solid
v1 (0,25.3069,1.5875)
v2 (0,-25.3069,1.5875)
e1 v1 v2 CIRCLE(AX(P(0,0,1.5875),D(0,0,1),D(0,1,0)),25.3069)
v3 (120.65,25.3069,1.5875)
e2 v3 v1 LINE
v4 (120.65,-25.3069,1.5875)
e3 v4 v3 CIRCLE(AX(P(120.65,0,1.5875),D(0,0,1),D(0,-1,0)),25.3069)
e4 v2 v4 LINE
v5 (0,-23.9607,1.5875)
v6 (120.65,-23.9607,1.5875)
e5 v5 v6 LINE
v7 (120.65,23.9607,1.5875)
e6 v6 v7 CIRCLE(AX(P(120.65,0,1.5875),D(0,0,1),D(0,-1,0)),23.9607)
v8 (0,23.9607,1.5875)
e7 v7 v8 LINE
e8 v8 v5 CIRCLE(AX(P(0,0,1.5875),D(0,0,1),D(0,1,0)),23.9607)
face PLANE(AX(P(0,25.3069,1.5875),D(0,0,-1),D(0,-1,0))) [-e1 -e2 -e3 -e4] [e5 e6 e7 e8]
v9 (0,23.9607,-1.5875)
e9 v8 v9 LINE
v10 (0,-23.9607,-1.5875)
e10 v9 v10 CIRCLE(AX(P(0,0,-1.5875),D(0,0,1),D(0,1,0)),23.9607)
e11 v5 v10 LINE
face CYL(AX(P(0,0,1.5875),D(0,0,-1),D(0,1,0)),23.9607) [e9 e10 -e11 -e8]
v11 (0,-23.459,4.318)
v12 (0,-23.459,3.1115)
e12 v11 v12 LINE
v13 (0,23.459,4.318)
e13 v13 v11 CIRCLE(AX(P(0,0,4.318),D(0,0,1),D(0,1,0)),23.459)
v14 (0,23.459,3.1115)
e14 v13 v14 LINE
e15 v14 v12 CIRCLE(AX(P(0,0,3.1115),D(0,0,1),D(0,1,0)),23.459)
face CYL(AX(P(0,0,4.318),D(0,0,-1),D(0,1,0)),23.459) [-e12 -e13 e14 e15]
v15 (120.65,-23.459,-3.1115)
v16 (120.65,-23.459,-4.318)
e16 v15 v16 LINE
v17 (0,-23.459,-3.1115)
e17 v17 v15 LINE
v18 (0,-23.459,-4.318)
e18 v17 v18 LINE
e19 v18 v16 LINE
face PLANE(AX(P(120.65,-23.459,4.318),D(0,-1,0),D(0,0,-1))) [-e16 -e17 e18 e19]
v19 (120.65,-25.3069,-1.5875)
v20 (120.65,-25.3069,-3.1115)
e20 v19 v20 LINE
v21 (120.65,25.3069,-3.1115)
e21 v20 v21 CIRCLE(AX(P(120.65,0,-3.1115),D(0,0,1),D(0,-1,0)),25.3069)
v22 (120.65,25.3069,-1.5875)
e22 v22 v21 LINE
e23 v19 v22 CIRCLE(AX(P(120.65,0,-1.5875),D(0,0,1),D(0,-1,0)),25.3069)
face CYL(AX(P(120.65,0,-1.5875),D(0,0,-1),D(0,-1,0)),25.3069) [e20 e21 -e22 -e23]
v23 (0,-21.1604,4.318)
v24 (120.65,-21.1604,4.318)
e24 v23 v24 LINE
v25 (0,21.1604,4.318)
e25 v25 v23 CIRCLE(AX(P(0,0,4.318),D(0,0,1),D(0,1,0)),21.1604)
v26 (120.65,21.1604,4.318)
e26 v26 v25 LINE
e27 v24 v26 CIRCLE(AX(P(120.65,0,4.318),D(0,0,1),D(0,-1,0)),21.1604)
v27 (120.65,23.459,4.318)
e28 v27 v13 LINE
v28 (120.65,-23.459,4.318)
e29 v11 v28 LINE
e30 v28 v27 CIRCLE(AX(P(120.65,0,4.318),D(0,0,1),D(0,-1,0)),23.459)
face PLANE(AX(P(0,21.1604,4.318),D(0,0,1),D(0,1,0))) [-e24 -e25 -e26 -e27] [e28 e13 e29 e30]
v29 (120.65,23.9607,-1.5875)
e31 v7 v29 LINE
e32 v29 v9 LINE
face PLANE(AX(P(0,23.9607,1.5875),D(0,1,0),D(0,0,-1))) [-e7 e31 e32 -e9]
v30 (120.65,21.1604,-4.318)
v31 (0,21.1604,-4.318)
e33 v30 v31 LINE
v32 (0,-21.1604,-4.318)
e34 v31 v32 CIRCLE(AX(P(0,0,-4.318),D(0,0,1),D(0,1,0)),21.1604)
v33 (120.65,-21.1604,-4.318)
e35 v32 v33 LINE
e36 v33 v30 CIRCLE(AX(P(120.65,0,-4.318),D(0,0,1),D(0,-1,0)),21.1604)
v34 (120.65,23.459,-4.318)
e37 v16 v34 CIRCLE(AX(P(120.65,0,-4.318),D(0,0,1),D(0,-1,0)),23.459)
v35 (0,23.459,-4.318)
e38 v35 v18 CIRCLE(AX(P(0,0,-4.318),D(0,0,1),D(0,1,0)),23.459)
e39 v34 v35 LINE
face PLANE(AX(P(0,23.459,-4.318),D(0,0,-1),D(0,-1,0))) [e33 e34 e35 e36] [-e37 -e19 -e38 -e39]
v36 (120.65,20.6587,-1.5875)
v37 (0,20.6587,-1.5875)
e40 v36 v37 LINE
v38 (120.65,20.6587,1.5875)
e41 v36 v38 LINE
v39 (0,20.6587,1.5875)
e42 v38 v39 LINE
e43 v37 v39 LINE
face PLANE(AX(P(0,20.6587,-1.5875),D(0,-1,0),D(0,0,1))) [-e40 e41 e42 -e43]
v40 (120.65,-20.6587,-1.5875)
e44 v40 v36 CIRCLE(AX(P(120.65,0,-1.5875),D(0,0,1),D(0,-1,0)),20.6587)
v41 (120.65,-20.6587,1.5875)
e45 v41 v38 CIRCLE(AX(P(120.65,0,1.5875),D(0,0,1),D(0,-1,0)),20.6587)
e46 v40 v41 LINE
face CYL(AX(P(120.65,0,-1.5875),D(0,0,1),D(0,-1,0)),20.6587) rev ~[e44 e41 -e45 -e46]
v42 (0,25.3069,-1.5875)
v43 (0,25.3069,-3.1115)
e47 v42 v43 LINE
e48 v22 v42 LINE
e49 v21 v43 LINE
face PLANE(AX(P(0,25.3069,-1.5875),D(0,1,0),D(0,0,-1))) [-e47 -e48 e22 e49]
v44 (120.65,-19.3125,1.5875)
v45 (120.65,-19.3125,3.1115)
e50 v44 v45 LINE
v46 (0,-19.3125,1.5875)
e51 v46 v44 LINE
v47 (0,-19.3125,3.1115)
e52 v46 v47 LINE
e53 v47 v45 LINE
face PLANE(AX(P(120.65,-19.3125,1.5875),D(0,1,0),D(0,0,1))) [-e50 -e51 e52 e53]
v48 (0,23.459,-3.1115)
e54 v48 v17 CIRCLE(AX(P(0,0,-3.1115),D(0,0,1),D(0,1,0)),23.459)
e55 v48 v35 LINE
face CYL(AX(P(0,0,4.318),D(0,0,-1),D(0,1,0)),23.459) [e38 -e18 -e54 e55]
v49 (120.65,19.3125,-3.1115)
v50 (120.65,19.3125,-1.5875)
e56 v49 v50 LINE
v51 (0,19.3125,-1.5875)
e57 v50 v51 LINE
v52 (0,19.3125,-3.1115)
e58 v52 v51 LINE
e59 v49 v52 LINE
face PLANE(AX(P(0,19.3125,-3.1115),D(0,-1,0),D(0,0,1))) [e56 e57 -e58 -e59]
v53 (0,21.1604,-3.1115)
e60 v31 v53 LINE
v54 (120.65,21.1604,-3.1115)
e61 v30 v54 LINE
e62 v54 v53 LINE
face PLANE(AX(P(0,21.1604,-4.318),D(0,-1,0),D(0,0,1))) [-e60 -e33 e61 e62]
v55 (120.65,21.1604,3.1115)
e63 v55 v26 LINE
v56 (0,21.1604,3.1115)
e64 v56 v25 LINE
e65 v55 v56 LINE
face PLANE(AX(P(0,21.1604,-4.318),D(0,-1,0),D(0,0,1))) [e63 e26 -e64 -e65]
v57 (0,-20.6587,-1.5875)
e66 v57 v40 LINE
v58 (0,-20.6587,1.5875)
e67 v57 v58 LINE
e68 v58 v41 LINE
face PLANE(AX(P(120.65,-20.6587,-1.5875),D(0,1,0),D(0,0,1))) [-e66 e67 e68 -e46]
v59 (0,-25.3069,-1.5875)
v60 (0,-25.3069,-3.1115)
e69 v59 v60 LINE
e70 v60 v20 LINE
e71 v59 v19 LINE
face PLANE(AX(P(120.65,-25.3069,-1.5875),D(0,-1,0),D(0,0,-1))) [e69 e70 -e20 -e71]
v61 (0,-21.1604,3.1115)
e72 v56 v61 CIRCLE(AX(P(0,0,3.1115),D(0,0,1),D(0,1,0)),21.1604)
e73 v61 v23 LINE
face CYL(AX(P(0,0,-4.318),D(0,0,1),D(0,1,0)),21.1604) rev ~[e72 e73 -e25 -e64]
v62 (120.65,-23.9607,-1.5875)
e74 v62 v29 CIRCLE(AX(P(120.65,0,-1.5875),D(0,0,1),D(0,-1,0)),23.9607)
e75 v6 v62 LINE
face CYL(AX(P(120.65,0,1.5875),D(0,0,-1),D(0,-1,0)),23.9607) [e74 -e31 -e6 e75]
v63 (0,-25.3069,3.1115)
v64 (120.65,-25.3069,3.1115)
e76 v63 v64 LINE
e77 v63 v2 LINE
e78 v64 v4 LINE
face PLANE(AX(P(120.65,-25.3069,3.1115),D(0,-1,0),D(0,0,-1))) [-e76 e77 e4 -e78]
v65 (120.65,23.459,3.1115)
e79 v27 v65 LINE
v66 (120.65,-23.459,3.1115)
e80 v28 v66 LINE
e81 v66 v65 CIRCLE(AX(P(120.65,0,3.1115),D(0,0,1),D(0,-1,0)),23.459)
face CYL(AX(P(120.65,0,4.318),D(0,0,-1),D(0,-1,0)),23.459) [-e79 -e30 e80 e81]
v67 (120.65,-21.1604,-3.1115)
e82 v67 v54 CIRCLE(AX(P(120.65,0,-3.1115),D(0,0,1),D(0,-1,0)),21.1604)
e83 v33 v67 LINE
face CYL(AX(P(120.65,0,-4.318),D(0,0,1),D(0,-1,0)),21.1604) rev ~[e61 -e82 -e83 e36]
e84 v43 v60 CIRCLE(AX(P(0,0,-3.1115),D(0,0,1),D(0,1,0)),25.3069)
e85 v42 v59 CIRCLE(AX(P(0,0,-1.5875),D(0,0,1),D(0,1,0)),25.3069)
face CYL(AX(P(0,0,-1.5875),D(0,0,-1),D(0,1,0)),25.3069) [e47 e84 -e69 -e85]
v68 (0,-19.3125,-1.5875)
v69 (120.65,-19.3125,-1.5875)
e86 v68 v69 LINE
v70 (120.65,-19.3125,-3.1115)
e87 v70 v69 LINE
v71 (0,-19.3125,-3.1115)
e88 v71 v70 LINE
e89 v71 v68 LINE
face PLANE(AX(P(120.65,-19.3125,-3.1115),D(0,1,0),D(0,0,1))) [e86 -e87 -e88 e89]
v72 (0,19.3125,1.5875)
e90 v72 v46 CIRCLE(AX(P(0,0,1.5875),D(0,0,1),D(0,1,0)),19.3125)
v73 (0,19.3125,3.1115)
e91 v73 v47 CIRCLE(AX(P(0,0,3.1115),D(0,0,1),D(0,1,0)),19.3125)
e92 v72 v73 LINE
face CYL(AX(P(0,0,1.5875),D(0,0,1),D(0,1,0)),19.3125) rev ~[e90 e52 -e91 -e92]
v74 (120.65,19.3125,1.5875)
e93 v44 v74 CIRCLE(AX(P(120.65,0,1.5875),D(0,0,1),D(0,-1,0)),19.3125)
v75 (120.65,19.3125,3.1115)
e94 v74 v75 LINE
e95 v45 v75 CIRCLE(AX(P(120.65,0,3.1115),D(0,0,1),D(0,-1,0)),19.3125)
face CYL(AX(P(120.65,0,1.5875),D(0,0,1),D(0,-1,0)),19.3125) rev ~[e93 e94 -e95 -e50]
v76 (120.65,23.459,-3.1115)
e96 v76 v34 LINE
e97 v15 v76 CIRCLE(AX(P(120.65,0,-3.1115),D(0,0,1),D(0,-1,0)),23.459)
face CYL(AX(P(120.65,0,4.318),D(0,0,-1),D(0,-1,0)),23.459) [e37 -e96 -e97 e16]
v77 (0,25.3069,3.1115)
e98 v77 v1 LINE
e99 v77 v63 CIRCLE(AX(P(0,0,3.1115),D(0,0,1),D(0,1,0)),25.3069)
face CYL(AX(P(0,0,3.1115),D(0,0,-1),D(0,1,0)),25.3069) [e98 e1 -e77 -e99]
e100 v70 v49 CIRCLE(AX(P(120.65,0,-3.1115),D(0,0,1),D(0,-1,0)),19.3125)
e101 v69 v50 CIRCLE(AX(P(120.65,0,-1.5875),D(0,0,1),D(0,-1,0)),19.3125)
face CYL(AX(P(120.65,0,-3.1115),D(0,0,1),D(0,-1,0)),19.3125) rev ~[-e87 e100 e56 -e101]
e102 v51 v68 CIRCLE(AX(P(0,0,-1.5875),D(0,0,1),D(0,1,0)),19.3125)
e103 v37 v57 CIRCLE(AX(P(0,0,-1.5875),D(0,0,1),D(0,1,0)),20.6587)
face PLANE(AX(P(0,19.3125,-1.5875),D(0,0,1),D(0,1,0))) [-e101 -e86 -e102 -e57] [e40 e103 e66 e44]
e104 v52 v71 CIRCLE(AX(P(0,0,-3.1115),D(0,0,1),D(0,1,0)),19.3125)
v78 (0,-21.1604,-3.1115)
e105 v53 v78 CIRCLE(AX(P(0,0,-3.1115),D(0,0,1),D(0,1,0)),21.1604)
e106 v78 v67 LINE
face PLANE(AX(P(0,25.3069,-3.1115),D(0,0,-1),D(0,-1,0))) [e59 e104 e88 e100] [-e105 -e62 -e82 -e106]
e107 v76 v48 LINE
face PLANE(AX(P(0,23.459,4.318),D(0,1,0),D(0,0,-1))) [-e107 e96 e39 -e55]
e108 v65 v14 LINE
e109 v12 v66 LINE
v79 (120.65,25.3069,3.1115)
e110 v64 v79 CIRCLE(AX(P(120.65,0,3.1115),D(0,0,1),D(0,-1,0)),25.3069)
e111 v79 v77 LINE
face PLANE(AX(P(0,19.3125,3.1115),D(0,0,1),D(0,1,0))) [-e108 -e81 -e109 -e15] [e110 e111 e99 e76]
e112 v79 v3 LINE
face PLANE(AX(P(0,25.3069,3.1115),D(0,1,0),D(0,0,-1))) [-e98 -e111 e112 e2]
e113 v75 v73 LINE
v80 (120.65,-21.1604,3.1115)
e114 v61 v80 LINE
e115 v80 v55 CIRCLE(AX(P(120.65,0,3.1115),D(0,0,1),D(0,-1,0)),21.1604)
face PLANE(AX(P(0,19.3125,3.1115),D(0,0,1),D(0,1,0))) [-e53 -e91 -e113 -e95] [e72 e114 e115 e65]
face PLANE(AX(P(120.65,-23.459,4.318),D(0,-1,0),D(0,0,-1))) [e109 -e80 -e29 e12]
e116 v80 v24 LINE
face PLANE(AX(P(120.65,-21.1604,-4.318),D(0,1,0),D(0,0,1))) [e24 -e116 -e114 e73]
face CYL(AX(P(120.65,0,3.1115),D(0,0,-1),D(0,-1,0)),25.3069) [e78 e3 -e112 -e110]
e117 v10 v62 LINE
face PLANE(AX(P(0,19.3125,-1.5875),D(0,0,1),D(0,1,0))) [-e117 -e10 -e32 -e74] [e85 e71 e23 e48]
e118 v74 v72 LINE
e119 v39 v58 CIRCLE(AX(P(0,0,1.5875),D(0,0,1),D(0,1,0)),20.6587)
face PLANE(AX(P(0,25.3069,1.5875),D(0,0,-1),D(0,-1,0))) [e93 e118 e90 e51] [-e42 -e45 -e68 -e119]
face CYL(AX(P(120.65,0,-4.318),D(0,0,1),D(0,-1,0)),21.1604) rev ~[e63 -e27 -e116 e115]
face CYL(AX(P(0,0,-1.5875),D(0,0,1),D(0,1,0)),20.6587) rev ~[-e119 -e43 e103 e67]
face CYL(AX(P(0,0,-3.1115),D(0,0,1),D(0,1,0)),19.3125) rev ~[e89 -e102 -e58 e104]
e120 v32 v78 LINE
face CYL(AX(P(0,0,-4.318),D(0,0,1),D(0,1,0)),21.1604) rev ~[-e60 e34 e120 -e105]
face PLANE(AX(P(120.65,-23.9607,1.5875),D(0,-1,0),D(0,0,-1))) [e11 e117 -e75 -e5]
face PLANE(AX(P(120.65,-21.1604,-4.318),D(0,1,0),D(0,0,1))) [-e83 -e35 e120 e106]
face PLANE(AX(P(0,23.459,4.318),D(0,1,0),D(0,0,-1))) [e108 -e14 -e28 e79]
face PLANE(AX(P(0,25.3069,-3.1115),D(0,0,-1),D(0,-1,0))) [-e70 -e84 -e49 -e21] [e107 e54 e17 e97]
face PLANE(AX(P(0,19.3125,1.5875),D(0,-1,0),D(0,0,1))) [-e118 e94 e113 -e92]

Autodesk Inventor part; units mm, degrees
ref_plane "Work Plane2" through (0, 0, 0) normal (-1, 0, 0) x (0, 0, 1)
ref_plane "Work Plane3" through (120.65, 0, 0) normal (-1, 0.0000001, 0) x (0, 0, 1)
sketch "Path" plane through (0, 0, 0) normal (0, 0, 1) x (1, 0, 0)
  arc A0 (0, 22.3097) -> (0, -22.3097) centre (0, 0) ccw
  arc A1 (120.65, -22.3097) -> (120.65, 22.3097) centre (120.65, 0) ccw
  line L0 (120.65, -22.3097) -> (0, -22.3097)
  line L1 (0, 22.3097) -> (120.65, 22.3097)
  dimension "d31" = 5.9944
ref_plane "Section Plane" through (0, -22.3097, 0) normal (1, 0, 0) x (0, 0, 1)
sketch "Section Sketch" plane through (0, -22.3097, 0) normal (1, 0, 0) x (0, 0, 1)
  line L0 (-4.318, -1.1493) -> (4.318, -1.1493)
  line L1 (4.318, -1.1493) -> (4.318, 1.1493)
  line L2 (4.318, 1.1493) -> (-4.318, 1.1493)
  line L3 (-4.318, 1.1493) -> (-4.318, -1.1493)
  line L4 (-1.5875, -1.651) -> (1.5875, -1.651)
  line L5 (1.5875, -1.651) -> (1.5875, 1.651)
  line L6 (1.5875, 1.651) -> (-1.5875, 1.651)
  line L7 (-1.5875, 1.651) -> (-1.5875, -1.651)
  line L8 (-1.5875, 0) -> (1.5875, 0) construction
  line L9 (-3.1115, -2.9972) -> (-1.5875, -2.9972)
  line L10 (-1.5875, -2.9972) -> (-1.5875, 2.9972)
  line L11 (-1.5875, 2.9972) -> (-3.1115, 2.9972)
  line L12 (-3.1115, 2.9972) -> (-3.1115, -2.9972)
  line L13 (1.5875, -2.9972) -> (3.1115, -2.9972)
  line L14 (3.1115, -2.9972) -> (3.1115, 2.9972)
  line L15 (3.1115, 2.9972) -> (1.5875, 2.9972)
  line L16 (1.5875, 2.9972) -> (1.5875, -2.9972)
  line L17 (-4.318, 0) -> (4.318, 0) construction
  point P0 (0, 0)
  point P1 (0, 0)
  dimension "d21" = 2.2987
  dimension "d22" = 3.302
  dimension "d23" = 3.175
  dimension "d24" = 1.524
  dimension "d31" = 5.9944
  dimension "d32" = 8.636
sweep "Solid" add profiles "Section Sketch" path "Path"
pattern_of_one "Strand Pattern"
equation "\"d21\" = da_d2"
equation "\"d22\" = da_d1"
equation "\"d23\" = da_b1"
equation "\"d24\" = da_t1 + da_t2"
equation "\"d30\" = da_pt"
equation "\"da_p\" = 6.35"
equation "\"da_b1\" = 3.175"
equation "\"da_h2\" = 5.9944"
equation "\"da_h3\" = 5.207"
equation "\"da_d1\" = 3.302"
equation "\"da_d2\" = 2.2987"
equation "\"da_pt\" = 6.4008"
equation "\"da_b\" = 8.636"
equation "\"da_t1\" = 0.762"
equation "\"da_t2\" = 0.762"
properties part number "Roller Chain"
